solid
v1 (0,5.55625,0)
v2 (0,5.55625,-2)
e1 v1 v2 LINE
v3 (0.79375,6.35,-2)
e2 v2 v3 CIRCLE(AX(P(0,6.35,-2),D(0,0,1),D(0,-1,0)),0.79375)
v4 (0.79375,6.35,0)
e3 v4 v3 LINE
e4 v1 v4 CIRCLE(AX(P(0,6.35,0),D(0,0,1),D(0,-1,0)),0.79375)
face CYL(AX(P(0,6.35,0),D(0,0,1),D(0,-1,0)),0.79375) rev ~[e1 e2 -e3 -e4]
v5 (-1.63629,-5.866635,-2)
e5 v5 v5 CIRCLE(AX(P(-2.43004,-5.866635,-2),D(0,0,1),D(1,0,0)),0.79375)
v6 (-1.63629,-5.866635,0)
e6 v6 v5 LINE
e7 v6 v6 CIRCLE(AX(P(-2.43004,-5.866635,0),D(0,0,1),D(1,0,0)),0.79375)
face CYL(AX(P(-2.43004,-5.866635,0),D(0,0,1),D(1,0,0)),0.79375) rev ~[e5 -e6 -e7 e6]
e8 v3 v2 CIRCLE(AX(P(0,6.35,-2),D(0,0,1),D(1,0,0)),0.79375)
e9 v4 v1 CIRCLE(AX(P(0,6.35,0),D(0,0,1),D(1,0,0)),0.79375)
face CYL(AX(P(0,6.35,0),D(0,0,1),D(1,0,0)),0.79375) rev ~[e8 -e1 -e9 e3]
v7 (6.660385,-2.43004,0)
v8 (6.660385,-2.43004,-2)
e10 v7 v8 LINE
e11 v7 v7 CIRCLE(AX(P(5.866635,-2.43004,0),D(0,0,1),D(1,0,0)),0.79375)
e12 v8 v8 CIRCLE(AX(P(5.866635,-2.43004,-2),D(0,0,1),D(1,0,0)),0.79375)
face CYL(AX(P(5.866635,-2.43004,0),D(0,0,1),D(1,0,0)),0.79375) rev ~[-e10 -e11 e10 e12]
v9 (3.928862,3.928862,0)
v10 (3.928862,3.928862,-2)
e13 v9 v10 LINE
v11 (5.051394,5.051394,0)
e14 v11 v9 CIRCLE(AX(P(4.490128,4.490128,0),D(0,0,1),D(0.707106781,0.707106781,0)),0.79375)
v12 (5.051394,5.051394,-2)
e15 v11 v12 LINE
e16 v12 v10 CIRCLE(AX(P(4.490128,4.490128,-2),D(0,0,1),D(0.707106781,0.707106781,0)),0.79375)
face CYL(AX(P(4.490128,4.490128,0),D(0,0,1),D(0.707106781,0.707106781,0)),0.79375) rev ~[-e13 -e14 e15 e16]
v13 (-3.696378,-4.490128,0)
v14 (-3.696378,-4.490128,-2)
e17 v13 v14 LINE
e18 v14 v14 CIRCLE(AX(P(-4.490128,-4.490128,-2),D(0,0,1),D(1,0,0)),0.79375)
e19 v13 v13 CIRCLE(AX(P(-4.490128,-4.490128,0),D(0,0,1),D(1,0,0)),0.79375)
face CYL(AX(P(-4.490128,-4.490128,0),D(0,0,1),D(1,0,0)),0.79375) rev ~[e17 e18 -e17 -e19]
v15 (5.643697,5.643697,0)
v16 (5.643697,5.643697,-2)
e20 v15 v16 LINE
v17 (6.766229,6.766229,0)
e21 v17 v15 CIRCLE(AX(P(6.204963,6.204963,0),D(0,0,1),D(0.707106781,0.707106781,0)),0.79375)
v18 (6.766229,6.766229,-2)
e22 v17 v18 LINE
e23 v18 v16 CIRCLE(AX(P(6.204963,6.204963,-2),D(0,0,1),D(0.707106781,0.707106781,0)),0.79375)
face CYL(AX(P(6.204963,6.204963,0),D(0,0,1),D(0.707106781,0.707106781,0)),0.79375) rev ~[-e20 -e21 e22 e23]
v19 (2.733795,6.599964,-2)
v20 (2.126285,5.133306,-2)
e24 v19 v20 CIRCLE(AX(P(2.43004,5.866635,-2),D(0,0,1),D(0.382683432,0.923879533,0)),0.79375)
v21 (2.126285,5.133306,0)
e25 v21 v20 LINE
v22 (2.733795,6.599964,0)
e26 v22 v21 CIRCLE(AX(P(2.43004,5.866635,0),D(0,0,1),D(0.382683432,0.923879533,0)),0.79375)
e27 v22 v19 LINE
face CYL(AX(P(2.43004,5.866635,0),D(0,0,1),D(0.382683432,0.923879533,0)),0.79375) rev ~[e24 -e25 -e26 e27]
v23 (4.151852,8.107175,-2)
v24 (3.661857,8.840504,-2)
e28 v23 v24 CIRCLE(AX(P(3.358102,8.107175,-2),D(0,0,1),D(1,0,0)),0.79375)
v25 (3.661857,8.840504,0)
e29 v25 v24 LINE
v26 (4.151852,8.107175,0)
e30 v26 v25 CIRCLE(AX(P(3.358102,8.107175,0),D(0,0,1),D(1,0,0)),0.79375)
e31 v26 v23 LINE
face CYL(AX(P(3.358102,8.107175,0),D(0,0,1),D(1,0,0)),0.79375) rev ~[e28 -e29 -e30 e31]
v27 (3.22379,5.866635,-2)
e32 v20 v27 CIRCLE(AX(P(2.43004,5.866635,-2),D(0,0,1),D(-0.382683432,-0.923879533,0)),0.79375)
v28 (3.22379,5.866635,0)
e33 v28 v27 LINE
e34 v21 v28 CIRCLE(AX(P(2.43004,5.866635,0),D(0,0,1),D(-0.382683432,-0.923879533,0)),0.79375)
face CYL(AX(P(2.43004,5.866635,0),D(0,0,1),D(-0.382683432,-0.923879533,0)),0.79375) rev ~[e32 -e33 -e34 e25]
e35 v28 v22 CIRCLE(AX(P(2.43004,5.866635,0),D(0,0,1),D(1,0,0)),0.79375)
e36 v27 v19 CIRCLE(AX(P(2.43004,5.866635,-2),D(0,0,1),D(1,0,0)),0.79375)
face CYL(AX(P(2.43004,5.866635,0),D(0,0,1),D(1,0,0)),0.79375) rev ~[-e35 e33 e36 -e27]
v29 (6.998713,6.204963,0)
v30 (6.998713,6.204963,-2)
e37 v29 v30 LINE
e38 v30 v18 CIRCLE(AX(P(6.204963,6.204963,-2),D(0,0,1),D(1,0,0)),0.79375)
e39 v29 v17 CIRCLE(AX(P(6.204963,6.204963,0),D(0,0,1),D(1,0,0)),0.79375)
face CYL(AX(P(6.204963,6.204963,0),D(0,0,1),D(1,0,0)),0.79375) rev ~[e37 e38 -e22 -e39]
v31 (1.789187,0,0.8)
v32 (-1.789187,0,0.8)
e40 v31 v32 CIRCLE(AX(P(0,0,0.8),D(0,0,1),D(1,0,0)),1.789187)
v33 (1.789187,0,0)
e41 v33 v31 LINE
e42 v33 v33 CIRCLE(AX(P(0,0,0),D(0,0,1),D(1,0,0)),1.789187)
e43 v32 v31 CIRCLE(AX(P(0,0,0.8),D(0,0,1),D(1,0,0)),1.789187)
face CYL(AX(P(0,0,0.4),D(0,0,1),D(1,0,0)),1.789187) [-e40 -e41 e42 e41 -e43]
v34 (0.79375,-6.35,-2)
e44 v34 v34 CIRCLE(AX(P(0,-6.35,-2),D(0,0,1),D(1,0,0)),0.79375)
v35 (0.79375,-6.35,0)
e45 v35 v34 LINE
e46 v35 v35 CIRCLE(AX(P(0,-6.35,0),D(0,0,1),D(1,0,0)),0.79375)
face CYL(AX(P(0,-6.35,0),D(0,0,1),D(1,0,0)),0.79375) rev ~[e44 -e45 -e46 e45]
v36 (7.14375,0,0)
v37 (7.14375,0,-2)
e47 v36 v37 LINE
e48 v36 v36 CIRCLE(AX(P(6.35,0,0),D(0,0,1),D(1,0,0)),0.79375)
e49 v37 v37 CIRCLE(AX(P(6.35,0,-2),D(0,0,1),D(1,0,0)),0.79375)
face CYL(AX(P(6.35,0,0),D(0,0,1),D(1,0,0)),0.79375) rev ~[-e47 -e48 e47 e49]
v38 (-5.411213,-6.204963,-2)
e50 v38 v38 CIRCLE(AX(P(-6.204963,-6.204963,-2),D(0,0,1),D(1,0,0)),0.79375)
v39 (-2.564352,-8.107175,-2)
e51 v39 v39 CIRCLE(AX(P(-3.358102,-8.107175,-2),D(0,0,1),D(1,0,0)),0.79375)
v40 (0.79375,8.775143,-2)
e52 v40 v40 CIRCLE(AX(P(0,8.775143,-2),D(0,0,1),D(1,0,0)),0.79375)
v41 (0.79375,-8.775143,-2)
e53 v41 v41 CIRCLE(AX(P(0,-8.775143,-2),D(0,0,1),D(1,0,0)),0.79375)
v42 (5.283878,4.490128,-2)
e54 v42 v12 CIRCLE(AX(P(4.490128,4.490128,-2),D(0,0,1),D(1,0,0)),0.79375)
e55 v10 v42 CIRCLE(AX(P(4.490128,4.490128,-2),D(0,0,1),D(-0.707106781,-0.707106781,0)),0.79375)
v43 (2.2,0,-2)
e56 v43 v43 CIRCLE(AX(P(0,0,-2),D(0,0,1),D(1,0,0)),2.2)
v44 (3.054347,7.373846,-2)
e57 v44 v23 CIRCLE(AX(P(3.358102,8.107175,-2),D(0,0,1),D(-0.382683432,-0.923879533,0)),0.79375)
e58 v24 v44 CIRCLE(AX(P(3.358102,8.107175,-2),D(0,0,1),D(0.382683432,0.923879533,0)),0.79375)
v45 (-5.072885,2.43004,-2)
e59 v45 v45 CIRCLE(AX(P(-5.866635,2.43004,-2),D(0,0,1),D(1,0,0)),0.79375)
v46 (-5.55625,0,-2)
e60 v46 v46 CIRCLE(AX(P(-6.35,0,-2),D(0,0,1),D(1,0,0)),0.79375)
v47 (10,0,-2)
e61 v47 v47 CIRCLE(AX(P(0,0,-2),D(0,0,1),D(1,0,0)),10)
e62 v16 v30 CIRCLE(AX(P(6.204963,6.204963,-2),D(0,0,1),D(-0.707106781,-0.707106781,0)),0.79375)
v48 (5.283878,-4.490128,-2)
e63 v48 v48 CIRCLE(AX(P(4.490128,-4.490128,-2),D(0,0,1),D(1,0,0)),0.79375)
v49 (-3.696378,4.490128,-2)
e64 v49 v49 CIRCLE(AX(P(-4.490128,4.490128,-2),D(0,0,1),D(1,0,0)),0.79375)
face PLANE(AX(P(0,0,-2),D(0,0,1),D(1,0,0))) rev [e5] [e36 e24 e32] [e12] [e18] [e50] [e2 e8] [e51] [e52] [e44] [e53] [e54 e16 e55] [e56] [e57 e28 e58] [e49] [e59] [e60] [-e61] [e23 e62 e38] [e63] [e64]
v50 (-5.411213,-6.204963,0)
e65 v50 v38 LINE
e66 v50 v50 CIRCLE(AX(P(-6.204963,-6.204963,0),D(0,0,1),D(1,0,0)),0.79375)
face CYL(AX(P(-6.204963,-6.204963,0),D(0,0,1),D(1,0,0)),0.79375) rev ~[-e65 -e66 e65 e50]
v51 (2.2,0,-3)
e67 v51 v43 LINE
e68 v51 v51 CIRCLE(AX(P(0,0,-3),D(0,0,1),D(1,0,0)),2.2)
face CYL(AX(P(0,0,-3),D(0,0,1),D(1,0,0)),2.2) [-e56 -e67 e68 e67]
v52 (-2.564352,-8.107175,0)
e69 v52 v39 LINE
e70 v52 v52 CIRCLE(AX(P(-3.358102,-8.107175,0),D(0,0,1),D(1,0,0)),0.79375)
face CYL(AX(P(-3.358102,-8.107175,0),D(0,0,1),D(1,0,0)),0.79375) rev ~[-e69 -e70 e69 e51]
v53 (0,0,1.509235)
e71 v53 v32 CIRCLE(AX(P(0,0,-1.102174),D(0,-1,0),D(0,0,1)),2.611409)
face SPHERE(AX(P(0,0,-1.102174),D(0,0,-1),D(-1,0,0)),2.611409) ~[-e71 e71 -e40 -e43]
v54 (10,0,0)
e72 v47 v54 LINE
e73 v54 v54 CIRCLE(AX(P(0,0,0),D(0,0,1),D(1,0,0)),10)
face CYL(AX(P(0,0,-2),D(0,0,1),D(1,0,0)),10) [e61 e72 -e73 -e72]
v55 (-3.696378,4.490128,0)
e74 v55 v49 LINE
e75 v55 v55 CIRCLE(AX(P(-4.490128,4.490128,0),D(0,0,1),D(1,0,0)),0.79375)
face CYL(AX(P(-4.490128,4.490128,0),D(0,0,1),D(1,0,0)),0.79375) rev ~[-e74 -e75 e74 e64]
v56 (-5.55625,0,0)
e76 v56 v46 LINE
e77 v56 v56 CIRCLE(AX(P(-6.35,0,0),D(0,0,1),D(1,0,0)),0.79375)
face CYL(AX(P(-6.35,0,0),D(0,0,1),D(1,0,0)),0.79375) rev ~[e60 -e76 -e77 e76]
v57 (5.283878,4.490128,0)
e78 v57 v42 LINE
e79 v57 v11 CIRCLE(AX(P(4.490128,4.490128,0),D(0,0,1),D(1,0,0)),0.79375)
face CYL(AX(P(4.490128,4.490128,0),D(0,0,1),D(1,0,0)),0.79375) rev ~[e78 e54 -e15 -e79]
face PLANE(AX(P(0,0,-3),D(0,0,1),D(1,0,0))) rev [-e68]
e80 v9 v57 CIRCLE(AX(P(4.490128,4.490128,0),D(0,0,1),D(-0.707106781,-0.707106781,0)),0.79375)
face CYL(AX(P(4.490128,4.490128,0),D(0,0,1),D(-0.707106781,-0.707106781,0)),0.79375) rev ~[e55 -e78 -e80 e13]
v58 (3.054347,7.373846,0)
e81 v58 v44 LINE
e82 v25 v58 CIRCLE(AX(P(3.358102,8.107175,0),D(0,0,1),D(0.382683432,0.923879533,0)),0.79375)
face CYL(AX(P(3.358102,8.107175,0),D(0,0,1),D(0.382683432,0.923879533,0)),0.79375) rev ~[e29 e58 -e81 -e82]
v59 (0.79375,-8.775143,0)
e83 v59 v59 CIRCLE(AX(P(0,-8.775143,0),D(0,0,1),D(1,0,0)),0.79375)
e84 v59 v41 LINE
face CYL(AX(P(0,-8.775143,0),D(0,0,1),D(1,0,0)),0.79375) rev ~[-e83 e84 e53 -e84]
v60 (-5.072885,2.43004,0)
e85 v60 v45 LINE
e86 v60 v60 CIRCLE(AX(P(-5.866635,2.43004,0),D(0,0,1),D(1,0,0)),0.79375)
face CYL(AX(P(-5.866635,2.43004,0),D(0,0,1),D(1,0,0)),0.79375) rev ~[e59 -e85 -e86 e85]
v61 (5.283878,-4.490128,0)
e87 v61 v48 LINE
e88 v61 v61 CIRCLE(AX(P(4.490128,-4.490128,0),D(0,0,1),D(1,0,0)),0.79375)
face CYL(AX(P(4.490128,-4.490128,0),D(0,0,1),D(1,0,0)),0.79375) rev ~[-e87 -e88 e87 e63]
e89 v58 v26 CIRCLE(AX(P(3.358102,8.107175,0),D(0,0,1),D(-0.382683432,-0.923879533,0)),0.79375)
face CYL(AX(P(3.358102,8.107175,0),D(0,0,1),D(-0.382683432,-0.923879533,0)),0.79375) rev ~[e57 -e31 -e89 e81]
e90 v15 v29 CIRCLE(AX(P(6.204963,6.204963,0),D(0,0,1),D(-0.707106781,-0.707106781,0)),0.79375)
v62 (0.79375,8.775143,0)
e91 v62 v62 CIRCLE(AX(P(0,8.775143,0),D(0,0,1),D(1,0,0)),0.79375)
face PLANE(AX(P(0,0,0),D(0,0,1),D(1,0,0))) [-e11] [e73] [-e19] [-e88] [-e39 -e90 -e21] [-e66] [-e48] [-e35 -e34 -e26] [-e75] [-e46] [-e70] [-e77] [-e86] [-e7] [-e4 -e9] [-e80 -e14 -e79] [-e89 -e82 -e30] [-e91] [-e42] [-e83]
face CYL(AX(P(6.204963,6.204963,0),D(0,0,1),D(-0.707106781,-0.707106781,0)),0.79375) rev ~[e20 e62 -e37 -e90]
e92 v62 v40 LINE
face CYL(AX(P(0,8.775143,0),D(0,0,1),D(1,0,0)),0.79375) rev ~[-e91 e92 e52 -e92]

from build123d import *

# Parameters (mm, degrees)
F0_W     = 1.7891867319
F0_H     = 0.8
F2_R     = 0.79375
F3_DEPTH = 25.4


with BuildPart() as f1:
    # F0 (on Front) → F1 (revolve)
    with BuildSketch(Plane.XZ):
        with Locations((0.894593366, 0.4)):
            Rectangle(F0_W, F0_H)
        Polygon((1.7891867319, 0), (0, 0), (0, -3), (2.2, -3), (2.2, -2), (10, -2), (10, 0), align=None)
    revolve(axis=Axis((0, 0, -1.5), (0, 0, 1)))

    # F2 (on face) → F3 (cut)
    with BuildSketch(Plane.XY):
        with BuildLine():
            ThreePointArc((0.79375, 6.35), (-0.5612660076, 6.9112660076), (0, 5.55625))
            ThreePointArc((0, 5.55625), (0.5612660076, 5.7887339924), (0.79375, 6.35))
        make_face()
        with BuildLine():
            Line((2.4300397955, 5.8666350314), (2.1262848211, 5.1333056525))
            ThreePointArc((2.1262848211, 5.1333056525), (2.871023668, 5.2066560267), (3.2237897955, 5.8666350314))
            ThreePointArc((3.2237897955, 5.8666350314), (3.0900188003, 6.3076189039), (2.73379477, 6.5999644104))
            Line((2.73379477, 6.5999644104), (2.4300397955, 5.8666350314))
        make_face()
        with BuildLine():
            ThreePointArc((2.73379477, 6.5999644104), (1.6967104166, 6.1703900059), (2.1262848211, 5.1333056525))
            Line((2.1262848211, 5.1333056525), (2.4300397955, 5.8666350314))
            Line((2.4300397955, 5.8666350314), (2.73379477, 6.5999644104))
        make_face()
        with BuildLine():
            Line((4.4901280605, 4.4901280605), (3.928862053, 3.928862053))
            ThreePointArc((3.928862053, 3.928862053), (4.793883035, 3.7567986816), (5.2838780605, 4.4901280605))
            ThreePointArc((5.2838780605, 4.4901280605), (5.2234574395, 4.793883035), (5.0513940681, 5.0513940681))
            Line((5.0513940681, 5.0513940681), (4.4901280605, 4.4901280605))
        make_face()
        with BuildLine():
            ThreePointArc((5.0513940681, 5.0513940681), (3.928862053, 5.0513940681), (3.928862053, 3.928862053))
            Line((3.928862053, 3.928862053), (4.4901280605, 4.4901280605))
            Line((4.4901280605, 4.4901280605), (5.0513940681, 5.0513940681))
        make_face()
        with BuildLine():
            ThreePointArc((3.6618567991, 8.8405043479), (2.6247724457, 8.4109299434), (3.0543468502, 7.37384559))
            Line((3.0543468502, 7.37384559), (3.6618567991, 8.8405043479))
        make_face()
        with BuildLine():
            Line((3.6618567991, 8.8405043479), (3.0543468502, 7.37384559))
            ThreePointArc((3.0543468502, 7.37384559), (3.7990856971, 7.4471959642), (4.1518518247, 8.107174969))
            ThreePointArc((4.1518518247, 8.107174969), (4.0180808294, 8.5481588414), (3.6618567991, 8.8405043479))
        make_face()
        with BuildLine():
            ThreePointArc((6.7662290954, 6.7662290954), (5.6436970802, 6.7662290954), (5.6436970802, 5.6436970802))
            Line((5.6436970802, 5.6436970802), (6.7662290954, 6.7662290954))
        make_face()
        with BuildLine():
            Line((6.7662290954, 6.7662290954), (5.6436970802, 5.6436970802))
            ThreePointArc((5.6436970802, 5.6436970802), (6.5087180622, 5.4716337089), (6.9987130878, 6.2049630878))
            ThreePointArc((6.9987130878, 6.2049630878), (6.9382924667, 6.5087180622), (6.7662290954, 6.7662290954))
        make_face()
        with Locations((-6.35, 0)):
            Circle(F2_R)
        with Locations((-5.8666350314, 2.4300397955)):
            Circle(F2_R)
        with Locations((-4.4901280605, 4.4901280605)):
            Circle(F2_R)
        with Locations((0, -6.35)):
            Circle(F2_R)
        with Locations((-2.4300397955, -5.8666350314)):
            Circle(F2_R)
        with Locations((-4.4901280605, -4.4901280605)):
            Circle(F2_R)
        with Locations((6.35, 0)):
            Circle(F2_R)
        with Locations((5.8666350314, -2.4300397955)):
            Circle(F2_R)
        with Locations((4.4901280605, -4.4901280605)):
            Circle(F2_R)
        with Locations((0, 8.7751429528)):
            Circle(F2_R)
        with Locations((0, -8.7751429528)):
            Circle(F2_R)
        with Locations((-3.3581018247, -8.107174969)):
            Circle(F2_R)
        with Locations((-6.2049630878, -6.2049630878)):
            Circle(F2_R)
    extrude(amount=-F3_DEPTH, mode=Mode.SUBTRACT)

    # F4 (on Front) → F5 (revolve)
    with BuildSketch(Plane.XZ):
        with BuildLine():
            Line((-1.7891867319, 0.8), (0, 0.8))
            Line((0, 0.8), (0, 1.5092346721))
            ThreePointArc((0, 1.5092346721), (-0.9623153046, 1.3254595112), (-1.7891867319, 0.8))
        make_face()
    revolve(axis=Axis((0, 0, 1.1546173361), (0, 0, 1)))


solid = f1.part
